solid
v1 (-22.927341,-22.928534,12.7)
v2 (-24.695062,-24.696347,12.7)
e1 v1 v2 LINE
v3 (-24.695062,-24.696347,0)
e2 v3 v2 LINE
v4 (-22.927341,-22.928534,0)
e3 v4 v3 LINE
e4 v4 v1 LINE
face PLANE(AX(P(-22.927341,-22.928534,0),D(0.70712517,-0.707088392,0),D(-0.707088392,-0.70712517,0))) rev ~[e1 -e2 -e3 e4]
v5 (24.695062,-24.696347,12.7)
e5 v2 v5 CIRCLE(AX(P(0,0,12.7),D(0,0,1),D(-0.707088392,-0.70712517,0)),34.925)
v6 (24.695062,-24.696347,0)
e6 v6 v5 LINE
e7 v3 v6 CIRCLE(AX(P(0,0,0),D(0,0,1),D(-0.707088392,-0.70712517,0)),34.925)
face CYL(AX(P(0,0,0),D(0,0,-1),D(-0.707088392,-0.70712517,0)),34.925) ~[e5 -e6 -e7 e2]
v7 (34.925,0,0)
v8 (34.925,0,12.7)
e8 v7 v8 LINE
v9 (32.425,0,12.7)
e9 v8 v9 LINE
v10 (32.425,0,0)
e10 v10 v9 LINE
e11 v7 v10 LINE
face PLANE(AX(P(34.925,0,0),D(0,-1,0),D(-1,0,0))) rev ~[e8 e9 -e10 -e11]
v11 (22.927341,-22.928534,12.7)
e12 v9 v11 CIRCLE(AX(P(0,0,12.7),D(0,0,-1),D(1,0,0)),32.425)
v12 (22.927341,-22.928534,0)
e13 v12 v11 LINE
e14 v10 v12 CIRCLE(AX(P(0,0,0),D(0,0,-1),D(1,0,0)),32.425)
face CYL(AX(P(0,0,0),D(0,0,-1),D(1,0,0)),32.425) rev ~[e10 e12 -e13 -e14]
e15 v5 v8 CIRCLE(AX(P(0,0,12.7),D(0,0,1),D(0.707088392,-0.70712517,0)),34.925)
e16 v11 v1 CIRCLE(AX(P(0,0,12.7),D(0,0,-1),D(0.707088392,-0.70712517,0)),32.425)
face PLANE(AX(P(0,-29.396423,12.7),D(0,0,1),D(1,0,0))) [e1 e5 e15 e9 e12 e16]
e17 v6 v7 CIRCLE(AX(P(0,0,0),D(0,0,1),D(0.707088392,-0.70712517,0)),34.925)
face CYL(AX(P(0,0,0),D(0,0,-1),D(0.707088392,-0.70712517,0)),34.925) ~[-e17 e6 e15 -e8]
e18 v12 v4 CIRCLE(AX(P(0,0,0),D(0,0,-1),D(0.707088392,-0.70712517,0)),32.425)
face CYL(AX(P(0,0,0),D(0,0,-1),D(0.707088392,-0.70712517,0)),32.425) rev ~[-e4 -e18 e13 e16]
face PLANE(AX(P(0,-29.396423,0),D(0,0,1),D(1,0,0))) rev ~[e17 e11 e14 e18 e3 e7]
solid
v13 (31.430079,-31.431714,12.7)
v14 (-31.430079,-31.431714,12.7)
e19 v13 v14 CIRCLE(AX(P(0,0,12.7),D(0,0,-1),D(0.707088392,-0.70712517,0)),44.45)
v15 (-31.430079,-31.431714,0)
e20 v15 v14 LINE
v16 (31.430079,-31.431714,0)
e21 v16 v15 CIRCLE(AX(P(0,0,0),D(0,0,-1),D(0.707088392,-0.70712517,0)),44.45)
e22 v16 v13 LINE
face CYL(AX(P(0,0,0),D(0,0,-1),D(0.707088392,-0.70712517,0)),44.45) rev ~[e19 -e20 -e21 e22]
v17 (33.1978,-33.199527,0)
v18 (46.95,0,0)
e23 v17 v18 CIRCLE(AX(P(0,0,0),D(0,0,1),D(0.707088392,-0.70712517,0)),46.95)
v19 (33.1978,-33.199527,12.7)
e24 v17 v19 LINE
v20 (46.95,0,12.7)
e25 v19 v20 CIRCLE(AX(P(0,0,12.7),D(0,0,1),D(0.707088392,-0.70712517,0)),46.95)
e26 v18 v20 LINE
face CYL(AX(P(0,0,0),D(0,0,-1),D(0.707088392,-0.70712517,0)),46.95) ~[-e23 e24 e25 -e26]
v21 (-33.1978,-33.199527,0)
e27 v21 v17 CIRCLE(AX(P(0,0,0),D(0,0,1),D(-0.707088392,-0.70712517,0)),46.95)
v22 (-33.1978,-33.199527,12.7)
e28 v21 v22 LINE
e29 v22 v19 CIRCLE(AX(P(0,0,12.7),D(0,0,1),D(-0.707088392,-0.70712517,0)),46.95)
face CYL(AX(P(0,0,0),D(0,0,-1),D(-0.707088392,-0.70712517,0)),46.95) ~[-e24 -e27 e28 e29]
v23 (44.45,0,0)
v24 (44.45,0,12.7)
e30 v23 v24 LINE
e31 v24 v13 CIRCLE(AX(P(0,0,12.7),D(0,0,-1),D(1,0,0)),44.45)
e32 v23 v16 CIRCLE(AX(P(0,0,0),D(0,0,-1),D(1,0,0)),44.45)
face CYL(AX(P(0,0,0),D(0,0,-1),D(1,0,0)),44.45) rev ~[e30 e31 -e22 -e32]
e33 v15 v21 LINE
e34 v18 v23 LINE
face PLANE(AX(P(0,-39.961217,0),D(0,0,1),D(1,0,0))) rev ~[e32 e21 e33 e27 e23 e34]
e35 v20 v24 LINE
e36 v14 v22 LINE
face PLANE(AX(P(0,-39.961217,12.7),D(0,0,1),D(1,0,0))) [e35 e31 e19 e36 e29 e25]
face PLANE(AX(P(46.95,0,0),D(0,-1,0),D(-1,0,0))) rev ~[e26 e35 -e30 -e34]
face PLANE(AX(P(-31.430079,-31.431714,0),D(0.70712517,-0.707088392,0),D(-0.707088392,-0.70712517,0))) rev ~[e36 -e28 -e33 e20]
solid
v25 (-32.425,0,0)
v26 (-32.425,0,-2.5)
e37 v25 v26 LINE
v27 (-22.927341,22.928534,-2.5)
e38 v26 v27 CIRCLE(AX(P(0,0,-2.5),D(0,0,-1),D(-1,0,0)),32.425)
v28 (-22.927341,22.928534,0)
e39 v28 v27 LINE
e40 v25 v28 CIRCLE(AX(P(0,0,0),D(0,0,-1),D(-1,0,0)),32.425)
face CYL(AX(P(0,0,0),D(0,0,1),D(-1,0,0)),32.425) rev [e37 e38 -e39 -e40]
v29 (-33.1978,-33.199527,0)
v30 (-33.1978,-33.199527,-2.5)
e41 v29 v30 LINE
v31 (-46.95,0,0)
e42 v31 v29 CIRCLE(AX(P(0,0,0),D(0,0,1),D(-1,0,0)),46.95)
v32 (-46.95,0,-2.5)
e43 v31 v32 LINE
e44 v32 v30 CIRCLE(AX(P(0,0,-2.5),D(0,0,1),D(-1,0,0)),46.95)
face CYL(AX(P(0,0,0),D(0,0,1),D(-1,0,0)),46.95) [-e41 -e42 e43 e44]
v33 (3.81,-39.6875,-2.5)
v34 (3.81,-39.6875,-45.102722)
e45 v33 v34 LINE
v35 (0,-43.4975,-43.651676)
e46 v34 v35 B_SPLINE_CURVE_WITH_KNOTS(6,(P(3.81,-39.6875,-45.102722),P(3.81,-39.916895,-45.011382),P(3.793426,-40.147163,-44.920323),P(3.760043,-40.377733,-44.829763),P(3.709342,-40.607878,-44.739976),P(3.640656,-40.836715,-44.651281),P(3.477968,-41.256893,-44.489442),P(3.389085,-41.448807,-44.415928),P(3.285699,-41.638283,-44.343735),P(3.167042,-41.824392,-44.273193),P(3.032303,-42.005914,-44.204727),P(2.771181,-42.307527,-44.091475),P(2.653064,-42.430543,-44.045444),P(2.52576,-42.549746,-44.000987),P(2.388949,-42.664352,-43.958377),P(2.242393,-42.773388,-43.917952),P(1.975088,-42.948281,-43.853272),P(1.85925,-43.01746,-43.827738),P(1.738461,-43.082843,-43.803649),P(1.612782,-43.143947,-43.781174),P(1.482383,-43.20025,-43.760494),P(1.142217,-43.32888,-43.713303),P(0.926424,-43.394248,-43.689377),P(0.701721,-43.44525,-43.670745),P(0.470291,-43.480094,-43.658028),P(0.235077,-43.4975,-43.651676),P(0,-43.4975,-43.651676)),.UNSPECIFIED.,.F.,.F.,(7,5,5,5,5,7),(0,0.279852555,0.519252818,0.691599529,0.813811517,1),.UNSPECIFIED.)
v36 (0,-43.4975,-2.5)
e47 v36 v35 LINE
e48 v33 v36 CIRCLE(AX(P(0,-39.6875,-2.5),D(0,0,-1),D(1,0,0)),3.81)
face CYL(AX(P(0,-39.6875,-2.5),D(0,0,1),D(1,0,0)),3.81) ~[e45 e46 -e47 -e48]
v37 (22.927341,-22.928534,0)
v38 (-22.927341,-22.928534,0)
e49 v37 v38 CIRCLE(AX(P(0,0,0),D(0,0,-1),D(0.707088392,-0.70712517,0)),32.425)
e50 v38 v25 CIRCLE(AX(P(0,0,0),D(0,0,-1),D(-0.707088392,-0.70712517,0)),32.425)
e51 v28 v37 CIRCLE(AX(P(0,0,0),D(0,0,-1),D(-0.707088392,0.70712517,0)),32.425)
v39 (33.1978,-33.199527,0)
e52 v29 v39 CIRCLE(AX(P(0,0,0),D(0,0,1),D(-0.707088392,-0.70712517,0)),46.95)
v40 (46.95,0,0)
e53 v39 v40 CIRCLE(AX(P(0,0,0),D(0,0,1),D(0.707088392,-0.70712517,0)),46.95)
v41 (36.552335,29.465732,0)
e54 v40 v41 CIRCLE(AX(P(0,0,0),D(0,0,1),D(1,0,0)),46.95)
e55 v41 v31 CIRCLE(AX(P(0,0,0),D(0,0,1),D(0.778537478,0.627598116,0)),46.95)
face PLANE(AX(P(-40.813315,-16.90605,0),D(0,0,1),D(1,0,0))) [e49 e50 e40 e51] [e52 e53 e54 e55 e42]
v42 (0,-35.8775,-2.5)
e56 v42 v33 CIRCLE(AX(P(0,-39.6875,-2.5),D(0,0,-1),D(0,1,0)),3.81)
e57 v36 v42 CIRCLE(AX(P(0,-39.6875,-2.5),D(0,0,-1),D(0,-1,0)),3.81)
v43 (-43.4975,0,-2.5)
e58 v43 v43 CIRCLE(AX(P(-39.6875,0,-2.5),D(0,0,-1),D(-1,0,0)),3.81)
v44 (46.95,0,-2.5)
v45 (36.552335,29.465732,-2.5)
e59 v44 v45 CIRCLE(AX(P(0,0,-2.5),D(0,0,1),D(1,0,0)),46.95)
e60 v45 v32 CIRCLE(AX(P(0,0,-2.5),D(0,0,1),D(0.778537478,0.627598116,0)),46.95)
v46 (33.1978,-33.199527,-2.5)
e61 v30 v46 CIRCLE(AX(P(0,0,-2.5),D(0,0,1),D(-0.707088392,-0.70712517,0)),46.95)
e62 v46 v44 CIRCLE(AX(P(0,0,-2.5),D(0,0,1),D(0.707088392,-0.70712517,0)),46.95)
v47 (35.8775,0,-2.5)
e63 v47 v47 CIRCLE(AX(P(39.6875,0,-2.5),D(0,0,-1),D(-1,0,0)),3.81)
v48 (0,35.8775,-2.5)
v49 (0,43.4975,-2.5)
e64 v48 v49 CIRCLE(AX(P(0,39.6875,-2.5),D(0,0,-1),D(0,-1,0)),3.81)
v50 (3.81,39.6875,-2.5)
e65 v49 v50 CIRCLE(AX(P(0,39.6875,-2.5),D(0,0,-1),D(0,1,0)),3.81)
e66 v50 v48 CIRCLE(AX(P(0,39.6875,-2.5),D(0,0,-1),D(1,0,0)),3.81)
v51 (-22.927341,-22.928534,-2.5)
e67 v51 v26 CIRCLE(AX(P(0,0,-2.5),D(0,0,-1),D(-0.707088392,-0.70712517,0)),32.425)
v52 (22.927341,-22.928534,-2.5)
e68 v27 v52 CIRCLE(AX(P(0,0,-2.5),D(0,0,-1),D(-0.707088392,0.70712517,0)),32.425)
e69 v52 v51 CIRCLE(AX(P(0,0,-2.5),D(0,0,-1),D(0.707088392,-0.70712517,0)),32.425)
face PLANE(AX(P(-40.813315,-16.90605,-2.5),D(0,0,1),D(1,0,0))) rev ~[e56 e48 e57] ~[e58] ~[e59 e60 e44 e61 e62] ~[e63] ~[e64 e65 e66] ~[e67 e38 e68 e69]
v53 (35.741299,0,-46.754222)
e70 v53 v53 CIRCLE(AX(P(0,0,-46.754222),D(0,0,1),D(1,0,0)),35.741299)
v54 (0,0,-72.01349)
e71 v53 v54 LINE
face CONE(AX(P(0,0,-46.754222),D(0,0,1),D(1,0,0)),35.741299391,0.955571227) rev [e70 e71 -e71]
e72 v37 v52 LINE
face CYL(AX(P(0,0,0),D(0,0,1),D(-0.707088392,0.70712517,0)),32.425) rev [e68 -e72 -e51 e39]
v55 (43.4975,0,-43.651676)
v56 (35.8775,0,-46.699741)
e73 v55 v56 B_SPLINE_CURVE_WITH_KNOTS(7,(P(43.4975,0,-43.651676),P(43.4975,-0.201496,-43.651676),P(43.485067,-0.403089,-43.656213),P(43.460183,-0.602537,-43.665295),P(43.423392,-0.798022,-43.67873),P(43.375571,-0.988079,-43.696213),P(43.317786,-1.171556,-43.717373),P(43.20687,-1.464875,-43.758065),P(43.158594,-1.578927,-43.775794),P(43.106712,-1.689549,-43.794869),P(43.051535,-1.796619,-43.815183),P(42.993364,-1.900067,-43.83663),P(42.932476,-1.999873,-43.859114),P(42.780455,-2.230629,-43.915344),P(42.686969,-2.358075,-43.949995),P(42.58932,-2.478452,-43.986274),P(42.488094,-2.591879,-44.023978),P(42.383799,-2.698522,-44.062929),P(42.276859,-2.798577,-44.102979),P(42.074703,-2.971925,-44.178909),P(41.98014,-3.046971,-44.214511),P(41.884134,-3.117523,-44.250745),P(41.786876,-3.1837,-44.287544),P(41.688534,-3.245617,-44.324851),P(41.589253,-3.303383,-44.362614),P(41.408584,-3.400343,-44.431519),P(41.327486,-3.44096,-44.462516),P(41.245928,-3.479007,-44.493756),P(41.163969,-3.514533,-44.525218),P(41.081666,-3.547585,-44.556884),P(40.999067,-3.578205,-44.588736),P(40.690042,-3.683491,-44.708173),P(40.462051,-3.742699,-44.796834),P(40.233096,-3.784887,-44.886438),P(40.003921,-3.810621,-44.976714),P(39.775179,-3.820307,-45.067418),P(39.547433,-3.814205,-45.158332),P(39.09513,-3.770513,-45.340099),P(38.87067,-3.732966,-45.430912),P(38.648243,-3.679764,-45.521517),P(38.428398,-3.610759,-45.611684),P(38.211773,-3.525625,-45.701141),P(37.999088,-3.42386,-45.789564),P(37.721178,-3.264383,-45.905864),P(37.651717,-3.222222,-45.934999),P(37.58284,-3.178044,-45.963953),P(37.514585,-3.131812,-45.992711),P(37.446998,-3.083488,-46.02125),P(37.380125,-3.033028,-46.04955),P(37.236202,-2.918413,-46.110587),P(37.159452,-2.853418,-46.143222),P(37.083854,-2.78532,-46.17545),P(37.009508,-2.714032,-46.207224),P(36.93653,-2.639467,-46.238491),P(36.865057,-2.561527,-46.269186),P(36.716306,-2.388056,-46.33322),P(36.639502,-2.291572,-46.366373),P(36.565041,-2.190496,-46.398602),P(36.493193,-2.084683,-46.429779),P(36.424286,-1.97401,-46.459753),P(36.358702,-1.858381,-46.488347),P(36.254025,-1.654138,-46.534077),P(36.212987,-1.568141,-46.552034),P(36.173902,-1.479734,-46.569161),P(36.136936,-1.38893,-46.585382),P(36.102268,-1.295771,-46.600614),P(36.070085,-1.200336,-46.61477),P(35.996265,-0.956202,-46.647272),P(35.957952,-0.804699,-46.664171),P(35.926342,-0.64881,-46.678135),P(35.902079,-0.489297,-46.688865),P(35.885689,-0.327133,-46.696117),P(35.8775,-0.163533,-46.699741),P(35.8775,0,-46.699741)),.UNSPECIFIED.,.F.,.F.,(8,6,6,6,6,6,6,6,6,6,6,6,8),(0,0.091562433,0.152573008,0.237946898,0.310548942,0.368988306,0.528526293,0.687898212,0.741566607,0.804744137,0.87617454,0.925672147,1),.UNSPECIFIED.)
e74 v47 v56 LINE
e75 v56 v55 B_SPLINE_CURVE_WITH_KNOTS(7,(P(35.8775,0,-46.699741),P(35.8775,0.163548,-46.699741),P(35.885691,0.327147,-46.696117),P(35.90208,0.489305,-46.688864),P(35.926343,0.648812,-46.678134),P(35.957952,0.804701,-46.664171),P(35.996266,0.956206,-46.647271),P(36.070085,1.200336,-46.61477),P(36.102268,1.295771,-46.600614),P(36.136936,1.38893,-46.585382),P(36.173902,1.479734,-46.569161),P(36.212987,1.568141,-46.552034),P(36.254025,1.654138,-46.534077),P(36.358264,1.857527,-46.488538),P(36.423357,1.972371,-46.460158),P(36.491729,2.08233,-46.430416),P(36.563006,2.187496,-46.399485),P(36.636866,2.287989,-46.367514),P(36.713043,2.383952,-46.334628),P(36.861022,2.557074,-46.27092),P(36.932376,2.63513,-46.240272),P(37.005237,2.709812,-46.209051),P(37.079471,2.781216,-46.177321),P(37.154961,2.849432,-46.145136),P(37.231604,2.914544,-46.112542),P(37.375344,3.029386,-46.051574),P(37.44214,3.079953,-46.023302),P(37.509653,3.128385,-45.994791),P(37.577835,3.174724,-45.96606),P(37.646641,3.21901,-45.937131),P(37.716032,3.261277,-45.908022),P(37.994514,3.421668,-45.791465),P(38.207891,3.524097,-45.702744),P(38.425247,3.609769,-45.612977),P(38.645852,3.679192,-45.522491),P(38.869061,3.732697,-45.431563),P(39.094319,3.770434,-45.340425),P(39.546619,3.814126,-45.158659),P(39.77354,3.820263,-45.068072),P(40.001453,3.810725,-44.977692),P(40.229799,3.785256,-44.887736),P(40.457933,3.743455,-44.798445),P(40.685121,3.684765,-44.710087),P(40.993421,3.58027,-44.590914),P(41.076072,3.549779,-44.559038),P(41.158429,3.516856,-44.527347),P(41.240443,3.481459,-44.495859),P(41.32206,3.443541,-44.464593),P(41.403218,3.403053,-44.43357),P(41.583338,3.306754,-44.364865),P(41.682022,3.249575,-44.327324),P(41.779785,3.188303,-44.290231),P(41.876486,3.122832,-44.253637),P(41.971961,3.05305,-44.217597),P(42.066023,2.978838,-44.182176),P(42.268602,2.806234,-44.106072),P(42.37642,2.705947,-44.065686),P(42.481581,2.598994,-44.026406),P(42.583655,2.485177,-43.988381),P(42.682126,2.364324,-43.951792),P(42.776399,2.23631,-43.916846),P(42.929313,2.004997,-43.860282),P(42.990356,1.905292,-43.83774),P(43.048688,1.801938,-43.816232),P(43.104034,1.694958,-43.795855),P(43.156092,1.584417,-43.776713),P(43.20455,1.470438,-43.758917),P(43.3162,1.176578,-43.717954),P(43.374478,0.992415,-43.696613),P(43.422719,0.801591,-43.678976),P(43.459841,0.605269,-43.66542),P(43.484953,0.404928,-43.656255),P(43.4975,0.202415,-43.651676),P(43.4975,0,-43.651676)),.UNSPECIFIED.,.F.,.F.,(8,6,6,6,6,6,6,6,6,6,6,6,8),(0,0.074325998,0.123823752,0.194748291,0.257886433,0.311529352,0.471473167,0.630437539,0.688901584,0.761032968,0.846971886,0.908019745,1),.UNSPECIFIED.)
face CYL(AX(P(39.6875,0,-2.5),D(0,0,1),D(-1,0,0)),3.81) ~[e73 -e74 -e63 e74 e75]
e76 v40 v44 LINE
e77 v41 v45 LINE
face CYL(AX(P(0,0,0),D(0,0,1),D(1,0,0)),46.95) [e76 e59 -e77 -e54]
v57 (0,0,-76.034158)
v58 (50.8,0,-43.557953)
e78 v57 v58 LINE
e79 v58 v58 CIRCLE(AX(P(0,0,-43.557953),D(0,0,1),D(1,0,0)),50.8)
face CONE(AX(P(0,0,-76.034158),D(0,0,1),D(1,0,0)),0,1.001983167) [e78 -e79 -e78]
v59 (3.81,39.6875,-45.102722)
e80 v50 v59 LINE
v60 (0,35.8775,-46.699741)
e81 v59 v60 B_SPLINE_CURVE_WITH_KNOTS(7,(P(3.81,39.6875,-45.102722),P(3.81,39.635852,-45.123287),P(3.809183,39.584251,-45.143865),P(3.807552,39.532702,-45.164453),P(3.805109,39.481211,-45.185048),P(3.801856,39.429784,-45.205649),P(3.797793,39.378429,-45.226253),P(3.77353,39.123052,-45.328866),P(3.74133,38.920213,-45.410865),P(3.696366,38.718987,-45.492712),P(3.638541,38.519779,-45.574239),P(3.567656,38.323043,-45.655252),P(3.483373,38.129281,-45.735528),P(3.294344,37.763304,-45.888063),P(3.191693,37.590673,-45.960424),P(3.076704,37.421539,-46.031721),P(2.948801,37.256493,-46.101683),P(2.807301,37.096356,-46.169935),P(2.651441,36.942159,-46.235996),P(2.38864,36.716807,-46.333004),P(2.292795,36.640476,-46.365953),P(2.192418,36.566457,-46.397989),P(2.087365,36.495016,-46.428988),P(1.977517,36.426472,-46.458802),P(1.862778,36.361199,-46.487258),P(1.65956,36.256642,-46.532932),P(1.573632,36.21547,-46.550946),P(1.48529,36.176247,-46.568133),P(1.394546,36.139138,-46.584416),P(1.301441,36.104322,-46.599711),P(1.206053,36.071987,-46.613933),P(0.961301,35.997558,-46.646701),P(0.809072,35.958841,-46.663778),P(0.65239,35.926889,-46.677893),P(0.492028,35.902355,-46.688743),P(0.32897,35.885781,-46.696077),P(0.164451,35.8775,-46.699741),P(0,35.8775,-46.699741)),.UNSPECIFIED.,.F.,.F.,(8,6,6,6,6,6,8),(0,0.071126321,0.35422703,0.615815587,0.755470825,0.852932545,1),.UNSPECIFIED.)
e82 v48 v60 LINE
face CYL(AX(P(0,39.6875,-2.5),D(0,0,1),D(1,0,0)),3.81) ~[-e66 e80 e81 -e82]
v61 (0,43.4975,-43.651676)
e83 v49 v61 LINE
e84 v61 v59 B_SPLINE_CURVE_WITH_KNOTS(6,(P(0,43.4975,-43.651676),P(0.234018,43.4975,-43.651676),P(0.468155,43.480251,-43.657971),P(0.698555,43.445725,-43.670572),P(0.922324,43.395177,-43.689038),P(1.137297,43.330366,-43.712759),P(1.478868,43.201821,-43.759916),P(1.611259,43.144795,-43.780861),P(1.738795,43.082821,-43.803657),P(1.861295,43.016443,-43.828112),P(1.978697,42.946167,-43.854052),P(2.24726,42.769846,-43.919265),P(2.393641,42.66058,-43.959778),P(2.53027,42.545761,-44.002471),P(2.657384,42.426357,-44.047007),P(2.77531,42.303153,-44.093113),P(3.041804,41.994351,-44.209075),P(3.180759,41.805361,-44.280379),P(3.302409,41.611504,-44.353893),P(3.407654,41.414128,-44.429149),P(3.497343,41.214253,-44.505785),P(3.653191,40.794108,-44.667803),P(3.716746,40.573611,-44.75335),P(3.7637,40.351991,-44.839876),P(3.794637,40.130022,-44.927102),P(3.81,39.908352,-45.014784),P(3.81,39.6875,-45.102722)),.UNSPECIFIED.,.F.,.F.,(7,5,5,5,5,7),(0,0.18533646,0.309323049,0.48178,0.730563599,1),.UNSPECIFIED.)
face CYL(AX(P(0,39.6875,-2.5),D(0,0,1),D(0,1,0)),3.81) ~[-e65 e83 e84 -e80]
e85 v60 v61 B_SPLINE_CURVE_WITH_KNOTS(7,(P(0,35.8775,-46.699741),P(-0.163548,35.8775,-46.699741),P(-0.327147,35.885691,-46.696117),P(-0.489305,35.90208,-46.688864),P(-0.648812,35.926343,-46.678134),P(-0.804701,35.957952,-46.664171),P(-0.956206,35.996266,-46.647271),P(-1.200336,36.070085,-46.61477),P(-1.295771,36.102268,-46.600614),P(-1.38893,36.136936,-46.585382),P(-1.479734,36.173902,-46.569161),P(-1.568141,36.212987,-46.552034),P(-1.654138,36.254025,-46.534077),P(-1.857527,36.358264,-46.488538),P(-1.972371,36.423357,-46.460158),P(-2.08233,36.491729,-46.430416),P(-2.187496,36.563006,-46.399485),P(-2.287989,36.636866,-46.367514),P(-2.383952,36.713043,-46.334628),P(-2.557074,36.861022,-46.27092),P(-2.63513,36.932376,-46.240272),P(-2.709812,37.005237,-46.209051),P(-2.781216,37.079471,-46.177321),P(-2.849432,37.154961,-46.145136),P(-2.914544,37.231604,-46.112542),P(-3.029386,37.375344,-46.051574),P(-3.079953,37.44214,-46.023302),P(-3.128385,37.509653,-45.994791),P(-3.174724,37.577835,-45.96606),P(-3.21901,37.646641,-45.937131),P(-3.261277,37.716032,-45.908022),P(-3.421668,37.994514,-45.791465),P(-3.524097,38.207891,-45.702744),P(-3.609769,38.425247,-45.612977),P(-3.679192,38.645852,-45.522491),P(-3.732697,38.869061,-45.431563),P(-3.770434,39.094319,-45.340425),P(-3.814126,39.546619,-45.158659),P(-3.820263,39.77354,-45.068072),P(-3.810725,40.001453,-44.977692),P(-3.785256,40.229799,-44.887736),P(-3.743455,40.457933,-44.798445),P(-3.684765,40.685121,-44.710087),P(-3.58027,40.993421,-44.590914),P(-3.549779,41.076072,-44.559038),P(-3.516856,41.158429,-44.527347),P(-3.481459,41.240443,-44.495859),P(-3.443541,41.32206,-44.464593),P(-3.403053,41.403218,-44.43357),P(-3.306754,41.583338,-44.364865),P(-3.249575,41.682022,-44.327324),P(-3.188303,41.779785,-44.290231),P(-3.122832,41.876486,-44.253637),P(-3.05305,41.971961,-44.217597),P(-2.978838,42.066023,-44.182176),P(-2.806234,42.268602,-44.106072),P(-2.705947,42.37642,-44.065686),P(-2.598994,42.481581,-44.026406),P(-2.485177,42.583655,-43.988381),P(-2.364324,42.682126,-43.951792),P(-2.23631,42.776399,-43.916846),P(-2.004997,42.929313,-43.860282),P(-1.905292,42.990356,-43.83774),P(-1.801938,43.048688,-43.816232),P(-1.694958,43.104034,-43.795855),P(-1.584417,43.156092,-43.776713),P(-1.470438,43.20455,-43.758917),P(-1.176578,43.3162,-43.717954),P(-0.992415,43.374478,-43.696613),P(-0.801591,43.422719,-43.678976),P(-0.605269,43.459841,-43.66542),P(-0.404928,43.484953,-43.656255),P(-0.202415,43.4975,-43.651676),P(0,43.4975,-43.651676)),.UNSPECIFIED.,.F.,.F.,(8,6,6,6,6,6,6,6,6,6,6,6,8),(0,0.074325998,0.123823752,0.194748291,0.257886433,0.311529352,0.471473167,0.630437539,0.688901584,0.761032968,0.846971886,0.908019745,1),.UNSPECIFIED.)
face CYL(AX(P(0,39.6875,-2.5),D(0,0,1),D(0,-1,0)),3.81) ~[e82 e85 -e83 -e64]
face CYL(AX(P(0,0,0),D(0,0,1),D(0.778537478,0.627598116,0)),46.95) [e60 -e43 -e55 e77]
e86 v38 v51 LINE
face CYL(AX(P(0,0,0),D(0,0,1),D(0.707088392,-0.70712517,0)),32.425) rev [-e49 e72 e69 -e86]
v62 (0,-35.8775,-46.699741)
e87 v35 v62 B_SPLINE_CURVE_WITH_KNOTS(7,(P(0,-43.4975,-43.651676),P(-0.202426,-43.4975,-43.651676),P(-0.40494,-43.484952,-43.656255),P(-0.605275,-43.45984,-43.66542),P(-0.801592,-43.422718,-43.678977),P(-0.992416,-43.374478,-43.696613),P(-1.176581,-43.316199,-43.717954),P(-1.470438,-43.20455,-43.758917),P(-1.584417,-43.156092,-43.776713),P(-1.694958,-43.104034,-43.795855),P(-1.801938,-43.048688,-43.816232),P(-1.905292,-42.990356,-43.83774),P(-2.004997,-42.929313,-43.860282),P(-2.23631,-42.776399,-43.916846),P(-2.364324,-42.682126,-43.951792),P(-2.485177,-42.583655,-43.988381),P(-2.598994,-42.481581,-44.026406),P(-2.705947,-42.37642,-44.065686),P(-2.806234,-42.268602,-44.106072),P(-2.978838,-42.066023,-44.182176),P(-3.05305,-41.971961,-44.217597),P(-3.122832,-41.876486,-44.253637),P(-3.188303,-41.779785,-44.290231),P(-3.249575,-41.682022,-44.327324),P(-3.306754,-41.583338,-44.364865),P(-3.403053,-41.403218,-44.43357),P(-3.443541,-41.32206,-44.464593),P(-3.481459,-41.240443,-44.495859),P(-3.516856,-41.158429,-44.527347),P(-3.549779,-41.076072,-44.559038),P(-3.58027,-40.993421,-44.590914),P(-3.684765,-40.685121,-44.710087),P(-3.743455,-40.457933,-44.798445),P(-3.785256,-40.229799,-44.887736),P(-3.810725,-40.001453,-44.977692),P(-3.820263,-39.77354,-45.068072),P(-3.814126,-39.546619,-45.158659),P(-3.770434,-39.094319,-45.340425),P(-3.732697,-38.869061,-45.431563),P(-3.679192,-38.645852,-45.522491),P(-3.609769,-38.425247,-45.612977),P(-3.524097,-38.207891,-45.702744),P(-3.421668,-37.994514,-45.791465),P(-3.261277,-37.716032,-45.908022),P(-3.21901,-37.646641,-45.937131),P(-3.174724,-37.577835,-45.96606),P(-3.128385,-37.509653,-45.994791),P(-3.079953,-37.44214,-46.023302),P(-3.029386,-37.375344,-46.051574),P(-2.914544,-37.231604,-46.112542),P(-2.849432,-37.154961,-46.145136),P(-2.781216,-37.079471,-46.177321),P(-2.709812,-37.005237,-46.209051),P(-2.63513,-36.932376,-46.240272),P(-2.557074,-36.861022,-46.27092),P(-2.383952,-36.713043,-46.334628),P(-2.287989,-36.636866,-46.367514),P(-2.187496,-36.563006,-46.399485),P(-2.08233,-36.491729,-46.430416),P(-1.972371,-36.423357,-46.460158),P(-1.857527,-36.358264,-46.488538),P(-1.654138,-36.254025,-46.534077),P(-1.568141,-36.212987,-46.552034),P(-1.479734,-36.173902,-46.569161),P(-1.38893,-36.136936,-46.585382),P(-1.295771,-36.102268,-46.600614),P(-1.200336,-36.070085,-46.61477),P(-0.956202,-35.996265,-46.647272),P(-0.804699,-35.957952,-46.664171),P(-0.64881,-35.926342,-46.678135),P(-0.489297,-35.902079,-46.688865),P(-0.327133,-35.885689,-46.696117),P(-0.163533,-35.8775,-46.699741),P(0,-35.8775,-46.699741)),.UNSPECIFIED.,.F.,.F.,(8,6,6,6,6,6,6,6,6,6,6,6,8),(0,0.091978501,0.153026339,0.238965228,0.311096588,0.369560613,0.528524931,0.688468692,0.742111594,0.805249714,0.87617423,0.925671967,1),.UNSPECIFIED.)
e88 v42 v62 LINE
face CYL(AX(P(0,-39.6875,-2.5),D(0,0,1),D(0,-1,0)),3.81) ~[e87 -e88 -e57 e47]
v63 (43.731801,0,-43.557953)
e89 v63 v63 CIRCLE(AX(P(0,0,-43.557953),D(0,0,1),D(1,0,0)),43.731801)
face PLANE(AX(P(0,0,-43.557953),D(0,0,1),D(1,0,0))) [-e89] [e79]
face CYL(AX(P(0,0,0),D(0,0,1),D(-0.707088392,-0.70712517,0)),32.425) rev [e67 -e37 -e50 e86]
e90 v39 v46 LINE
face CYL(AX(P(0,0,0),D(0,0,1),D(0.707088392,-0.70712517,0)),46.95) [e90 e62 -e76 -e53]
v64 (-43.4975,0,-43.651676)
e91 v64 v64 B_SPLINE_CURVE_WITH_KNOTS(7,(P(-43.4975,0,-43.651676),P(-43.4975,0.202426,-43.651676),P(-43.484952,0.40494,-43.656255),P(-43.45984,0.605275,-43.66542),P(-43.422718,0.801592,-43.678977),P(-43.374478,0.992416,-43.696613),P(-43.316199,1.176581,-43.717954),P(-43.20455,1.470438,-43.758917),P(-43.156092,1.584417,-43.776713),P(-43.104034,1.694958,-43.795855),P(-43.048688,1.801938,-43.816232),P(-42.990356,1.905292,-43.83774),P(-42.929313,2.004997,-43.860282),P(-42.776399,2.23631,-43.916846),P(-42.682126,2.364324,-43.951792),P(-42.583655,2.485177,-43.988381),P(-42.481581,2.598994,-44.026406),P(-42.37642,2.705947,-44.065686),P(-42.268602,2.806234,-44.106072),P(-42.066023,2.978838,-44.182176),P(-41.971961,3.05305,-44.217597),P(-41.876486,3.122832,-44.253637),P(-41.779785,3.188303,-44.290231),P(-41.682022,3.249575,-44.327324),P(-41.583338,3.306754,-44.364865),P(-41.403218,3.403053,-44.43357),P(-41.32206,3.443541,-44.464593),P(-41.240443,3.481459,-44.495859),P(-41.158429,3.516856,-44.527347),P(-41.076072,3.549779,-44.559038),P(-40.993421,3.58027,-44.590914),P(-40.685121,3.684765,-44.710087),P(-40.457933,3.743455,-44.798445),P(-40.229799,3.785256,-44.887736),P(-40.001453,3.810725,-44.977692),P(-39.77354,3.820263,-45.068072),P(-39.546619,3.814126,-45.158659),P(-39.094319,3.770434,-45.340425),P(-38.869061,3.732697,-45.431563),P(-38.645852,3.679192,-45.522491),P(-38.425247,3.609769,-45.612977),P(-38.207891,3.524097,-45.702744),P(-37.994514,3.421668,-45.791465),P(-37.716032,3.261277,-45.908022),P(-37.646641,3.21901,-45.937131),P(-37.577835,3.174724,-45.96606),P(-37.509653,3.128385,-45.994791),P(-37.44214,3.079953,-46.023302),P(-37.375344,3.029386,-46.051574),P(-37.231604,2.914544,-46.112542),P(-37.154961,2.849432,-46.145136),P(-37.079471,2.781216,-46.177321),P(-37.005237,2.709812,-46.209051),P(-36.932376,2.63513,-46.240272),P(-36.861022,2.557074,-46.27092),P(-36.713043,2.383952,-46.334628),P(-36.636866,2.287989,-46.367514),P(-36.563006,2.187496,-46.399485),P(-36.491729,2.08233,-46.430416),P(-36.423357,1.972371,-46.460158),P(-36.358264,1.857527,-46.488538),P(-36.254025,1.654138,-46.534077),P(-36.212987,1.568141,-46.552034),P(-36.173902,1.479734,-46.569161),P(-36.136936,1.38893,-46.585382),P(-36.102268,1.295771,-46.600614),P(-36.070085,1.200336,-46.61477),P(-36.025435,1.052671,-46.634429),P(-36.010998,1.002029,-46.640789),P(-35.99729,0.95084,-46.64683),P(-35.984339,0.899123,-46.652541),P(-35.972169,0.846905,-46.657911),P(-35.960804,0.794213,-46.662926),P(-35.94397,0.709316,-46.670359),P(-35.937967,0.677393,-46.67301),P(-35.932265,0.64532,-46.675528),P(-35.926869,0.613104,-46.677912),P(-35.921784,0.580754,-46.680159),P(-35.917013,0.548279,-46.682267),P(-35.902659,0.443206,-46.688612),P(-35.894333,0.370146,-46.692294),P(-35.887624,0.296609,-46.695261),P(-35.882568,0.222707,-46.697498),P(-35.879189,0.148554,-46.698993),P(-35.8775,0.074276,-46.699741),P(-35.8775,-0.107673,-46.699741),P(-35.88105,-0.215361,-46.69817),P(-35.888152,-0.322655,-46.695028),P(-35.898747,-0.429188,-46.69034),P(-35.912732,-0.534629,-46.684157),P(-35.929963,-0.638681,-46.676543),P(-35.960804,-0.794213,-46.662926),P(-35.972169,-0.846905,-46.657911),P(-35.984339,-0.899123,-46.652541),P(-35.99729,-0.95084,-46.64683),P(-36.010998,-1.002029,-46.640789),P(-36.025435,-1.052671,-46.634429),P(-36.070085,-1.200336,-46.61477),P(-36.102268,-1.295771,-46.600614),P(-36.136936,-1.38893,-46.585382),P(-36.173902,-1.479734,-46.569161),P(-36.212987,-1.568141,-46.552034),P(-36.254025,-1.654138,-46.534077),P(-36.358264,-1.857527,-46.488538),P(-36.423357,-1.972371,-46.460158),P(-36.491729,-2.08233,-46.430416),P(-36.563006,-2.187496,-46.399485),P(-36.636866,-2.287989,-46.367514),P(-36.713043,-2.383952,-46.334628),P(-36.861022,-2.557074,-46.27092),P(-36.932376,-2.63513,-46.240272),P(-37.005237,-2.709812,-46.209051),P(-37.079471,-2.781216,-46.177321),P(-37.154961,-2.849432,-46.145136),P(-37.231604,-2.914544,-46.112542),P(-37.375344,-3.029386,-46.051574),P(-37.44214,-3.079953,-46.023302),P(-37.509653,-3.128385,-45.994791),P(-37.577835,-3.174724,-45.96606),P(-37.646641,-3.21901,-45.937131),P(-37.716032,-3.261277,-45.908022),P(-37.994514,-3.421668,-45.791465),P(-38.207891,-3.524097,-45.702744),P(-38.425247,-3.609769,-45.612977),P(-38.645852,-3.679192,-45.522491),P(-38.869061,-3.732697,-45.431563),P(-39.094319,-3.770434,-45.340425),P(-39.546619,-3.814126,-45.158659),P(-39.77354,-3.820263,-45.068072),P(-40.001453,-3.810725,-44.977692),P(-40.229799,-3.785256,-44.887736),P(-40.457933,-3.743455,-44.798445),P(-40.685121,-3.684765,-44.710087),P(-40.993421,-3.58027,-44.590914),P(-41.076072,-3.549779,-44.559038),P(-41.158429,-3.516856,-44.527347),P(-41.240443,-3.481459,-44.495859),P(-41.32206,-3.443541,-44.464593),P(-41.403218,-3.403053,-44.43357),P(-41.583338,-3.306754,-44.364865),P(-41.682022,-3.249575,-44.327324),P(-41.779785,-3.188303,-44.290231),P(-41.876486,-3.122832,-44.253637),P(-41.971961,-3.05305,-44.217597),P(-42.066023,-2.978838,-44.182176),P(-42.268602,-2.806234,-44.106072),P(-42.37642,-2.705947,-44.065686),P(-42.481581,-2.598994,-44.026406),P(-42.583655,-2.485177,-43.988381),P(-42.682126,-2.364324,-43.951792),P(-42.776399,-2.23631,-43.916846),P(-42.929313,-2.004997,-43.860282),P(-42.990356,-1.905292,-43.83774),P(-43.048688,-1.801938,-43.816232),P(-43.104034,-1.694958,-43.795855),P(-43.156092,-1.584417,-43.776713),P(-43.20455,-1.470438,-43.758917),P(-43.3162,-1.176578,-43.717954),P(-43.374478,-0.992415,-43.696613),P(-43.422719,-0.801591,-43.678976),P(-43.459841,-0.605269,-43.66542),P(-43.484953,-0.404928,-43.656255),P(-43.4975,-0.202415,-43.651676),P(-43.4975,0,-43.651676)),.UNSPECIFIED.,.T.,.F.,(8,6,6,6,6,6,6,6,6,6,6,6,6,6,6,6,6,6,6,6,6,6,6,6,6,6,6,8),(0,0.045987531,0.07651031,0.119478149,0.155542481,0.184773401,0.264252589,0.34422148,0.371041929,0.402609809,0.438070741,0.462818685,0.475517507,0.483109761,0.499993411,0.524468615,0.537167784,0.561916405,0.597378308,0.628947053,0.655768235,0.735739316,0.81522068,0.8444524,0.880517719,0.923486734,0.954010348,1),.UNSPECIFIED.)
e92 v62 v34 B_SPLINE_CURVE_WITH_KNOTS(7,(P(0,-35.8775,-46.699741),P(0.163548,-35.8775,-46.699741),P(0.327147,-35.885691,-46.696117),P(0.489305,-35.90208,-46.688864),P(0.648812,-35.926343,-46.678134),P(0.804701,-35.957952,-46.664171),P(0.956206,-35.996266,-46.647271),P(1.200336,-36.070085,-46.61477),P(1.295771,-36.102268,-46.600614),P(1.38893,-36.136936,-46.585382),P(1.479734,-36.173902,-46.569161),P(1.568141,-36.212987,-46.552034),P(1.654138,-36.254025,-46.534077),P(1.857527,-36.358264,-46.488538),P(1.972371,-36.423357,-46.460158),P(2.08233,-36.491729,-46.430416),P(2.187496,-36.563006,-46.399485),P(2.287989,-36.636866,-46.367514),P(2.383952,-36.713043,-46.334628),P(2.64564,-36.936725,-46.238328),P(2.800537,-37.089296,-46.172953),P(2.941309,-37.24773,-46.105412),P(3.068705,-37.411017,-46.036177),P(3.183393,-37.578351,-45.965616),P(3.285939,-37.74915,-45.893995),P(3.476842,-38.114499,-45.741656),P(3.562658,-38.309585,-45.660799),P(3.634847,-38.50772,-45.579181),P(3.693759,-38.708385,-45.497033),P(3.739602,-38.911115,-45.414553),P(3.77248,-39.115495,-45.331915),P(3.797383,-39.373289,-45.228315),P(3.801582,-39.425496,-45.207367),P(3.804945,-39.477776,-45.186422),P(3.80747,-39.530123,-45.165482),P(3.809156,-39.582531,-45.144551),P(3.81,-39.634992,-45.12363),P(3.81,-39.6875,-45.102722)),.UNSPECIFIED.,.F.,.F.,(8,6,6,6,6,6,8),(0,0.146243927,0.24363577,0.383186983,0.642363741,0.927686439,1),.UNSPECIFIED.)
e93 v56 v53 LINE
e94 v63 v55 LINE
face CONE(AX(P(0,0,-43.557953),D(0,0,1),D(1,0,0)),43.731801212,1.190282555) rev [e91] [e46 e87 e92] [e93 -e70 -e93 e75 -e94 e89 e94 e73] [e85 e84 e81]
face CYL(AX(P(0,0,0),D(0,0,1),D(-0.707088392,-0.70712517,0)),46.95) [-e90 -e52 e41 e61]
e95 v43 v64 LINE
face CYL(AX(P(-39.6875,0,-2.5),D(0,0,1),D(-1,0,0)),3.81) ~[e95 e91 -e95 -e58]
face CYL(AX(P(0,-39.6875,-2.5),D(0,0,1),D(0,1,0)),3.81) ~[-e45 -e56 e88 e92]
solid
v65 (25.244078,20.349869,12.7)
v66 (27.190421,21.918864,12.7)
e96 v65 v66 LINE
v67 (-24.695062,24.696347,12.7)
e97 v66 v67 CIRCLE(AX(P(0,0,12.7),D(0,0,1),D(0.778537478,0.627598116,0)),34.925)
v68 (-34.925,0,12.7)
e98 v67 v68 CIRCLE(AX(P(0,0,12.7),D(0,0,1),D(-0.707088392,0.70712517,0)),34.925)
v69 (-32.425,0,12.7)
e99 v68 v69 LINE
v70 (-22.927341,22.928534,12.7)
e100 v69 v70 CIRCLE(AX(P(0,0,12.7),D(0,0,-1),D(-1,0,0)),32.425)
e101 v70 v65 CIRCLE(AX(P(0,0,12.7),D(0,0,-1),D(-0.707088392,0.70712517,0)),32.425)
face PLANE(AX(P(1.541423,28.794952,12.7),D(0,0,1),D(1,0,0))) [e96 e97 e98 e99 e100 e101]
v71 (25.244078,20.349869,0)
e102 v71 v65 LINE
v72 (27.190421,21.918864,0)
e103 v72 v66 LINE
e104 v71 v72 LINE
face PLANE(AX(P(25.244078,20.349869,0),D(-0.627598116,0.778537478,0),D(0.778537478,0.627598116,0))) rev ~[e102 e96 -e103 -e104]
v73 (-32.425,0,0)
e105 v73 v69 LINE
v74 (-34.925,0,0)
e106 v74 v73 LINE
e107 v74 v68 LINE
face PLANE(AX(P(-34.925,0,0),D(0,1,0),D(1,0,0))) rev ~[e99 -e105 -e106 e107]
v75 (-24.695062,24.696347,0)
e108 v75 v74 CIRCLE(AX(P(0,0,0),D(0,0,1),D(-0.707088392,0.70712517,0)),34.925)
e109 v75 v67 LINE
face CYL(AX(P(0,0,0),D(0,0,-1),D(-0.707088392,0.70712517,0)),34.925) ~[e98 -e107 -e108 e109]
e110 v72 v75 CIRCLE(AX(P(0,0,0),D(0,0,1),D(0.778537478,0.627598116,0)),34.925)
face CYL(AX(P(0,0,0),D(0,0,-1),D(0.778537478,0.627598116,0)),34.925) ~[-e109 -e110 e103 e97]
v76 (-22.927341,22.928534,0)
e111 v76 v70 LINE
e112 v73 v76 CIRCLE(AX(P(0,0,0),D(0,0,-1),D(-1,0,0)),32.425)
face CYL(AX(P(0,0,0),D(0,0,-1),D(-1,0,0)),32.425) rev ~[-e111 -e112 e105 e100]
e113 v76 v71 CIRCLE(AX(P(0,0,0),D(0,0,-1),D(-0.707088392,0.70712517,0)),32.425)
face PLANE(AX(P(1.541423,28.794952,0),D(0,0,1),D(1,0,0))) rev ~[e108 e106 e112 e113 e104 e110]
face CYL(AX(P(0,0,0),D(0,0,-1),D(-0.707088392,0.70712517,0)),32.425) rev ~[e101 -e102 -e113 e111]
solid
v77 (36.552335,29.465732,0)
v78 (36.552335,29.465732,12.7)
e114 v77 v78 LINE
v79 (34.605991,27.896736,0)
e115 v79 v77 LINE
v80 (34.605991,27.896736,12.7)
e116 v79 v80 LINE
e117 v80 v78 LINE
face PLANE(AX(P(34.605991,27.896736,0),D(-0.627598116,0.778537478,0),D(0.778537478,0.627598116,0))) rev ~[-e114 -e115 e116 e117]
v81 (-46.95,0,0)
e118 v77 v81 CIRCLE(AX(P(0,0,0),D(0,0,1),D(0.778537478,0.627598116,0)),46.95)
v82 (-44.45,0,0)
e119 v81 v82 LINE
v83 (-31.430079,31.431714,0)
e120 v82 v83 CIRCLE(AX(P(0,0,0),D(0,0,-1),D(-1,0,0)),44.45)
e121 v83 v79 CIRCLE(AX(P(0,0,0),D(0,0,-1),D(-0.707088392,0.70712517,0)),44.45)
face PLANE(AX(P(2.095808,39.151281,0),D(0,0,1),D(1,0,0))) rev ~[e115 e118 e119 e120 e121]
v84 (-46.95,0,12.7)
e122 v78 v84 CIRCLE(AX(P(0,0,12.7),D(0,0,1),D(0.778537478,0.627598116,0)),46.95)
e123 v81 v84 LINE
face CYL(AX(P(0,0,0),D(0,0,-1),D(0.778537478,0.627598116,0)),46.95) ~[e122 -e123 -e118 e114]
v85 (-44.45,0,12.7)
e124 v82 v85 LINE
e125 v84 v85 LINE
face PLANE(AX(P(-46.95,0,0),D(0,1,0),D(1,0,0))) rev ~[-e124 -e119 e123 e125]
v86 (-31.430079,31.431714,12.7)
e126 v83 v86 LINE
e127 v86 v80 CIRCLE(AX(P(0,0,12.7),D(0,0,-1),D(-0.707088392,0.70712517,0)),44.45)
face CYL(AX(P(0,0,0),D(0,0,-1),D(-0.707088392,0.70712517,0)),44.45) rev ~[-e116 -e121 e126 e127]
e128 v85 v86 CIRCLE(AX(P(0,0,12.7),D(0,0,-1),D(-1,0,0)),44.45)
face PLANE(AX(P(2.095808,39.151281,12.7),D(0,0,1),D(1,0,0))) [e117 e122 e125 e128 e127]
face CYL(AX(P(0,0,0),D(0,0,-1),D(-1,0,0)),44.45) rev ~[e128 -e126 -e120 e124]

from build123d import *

# Parameters (mm, degrees)
F1_DEPTH = 12.7
F2_DEPTH = 2.5
F4_DEPTH = 44.45


# Not quite as in the source:
# - a length typed as a fraction of an inch, garbled in the dataset ("3 / 203.2 mm" for 3/8 in), is restored


with BuildPart() as f1:
    # F0 (on Top) → F1 (new body)
    with BuildSketch(Plane.XY):
        with BuildLine():
            Line((33.1977999888, -33.1995267422), (31.4300790096, -31.4317138166))
            ThreePointArc((31.4300790096, -31.4317138166), (0, -44.45), (-31.4300790096, -31.4317138166))
            Line((-31.4300790096, -31.4317138166), (-33.1977999888, -33.1995267422))
            ThreePointArc((-33.1977999888, -33.1995267422), (0, -46.95), (33.1977999888, -33.1995267422))
        make_face()
        with BuildLine():
            Line((46.95, 0), (44.45, 0))
            ThreePointArc((44.45, 0), (41.0662240289, -17.0108125618), (31.4300790096, -31.4317138166))
            Line((31.4300790096, -31.4317138166), (33.1977999888, -33.1995267422))
            ThreePointArc((33.1977999888, -33.1995267422), (43.3759104197, -17.967551176), (46.95, 0))
        make_face()
    extrude(amount=F1_DEPTH)


with BuildPart() as f1b:
    # F0 (on Top) → F1, piece 2 (new body)
    with BuildSketch(Plane.XY):
        with BuildLine():
            ThreePointArc((-31.4300790096, 31.4317138166), (2.3760514819, 44.3864492763), (34.6059908934, 27.8967362658))
            Line((34.6059908934, 27.8967362658), (36.5523345882, 29.4657315563))
            ThreePointArc((36.5523345882, 29.4657315563), (2.5096876732, 46.8828749949), (-33.1977999888, 33.1995267422))
            Line((-33.1977999888, 33.1995267422), (-31.4300790096, 31.4317138166))
        make_face()
        with BuildLine():
            ThreePointArc((-44.45, 0), (-41.0662240289, 17.0108125618), (-31.4300790096, 31.4317138166))
            Line((-31.4300790096, 31.4317138166), (-33.1977999888, 33.1995267422))
            ThreePointArc((-33.1977999888, 33.1995267422), (-43.3759104197, 17.967551176), (-46.95, 0))
            Line((-46.95, 0), (-44.45, 0))
        make_face()
    extrude(amount=F1_DEPTH)


with BuildPart() as f1c:
    # F0 (on Top) → F1, piece 3 (new body)
    with BuildSketch(Plane.XY):
        with BuildLine():
            ThreePointArc((-24.695062079, -24.6963465702), (0, -34.925), (24.695062079, -24.6963465702))
            Line((24.695062079, -24.6963465702), (23.4743895005, -23.4756104995))
            Line((23.4743895005, -23.4756104995), (22.9273410998, -22.9285336446))
            ThreePointArc((22.9273410998, -22.9285336446), (0, -32.425), (-22.9273410998, -22.9285336446))
            Line((-22.9273410998, -22.9285336446), (-24.695062079, -24.6963465702))
        make_face()
        with BuildLine():
            ThreePointArc((24.695062079, -24.6963465702), (32.2663188798, -13.3656384414), (34.925, 0))
            Line((34.925, 0), (32.425, 0))
            ThreePointArc((32.425, 0), (29.956632489, -12.4088998271), (22.9273410998, -22.9285336446))
            Line((22.9273410998, -22.9285336446), (23.4743895005, -23.4756104995))
            Line((23.4743895005, -23.4756104995), (24.695062079, -24.6963465702))
        make_face()
    extrude(amount=F1_DEPTH)


with BuildPart() as f1d:
    # F0 (on Top) → F1, piece 4 (new body)
    with BuildSketch(Plane.XY):
        with BuildLine():
            Line((25.2440777215, 20.3498689183), (27.1904214163, 21.9188642088))
            ThreePointArc((27.1904214163, 21.9188642088), (1.8668975929, 34.8750672885), (-24.695062079, 24.6963465702))
            Line((-24.695062079, 24.6963465702), (-22.9273410998, 22.9285336446))
            ThreePointArc((-22.9273410998, 22.9285336446), (1.7332614016, 32.3786415699), (25.2440777215, 20.3498689183))
        make_face()
        with BuildLine():
            Line((-22.9273410998, 22.9285336446), (-24.695062079, 24.6963465702))
            ThreePointArc((-24.695062079, 24.6963465702), (-32.2663188798, 13.3656384414), (-34.925, 0))
            Line((-34.925, 0), (-32.425, 0))
            ThreePointArc((-32.425, 0), (-29.956632489, 12.4088998271), (-22.9273410998, 22.9285336446))
        make_face()
    extrude(amount=F1_DEPTH)


with BuildPart() as f2:
    # F0 (on Top) → F2 (new body)
    with BuildSketch(Plane.XY):
        with BuildLine():
            Line((-33.1977999888, -33.1995267422), (-31.4300790096, -31.4317138166))
            ThreePointArc((-31.4300790096, -31.4317138166), (-41.0662240289, -17.0108125618), (-44.45, 0))
            Line((-44.45, 0), (-46.95, 0))
            ThreePointArc((-46.95, 0), (-43.3759104197, -17.967551176), (-33.1977999888, -33.1995267422))
        make_face()
        with BuildLine():
            Line((33.1977999888, -33.1995267422), (31.4300790096, -31.4317138166))
            ThreePointArc((31.4300790096, -31.4317138166), (0, -44.45), (-31.4300790096, -31.4317138166))
            Line((-31.4300790096, -31.4317138166), (-33.1977999888, -33.1995267422))
            ThreePointArc((-33.1977999888, -33.1995267422), (0, -46.95), (33.1977999888, -33.1995267422))
        make_face()
        with BuildLine():
            Line((-31.4300790096, -31.4317138166), (-24.695062079, -24.6963465702))
            ThreePointArc((-24.695062079, -24.6963465702), (-32.2663188798, -13.3656384414), (-34.925, 0))
            Line((-34.925, 0), (-44.45, 0))
            ThreePointArc((-44.45, 0), (-41.0662240289, -17.0108125618), (-31.4300790096, -31.4317138166))
        make_face()
        with BuildLine():
            Line((31.4300790096, -31.4317138166), (24.695062079, -24.6963465702))
            ThreePointArc((24.695062079, -24.6963465702), (0, -34.925), (-24.695062079, -24.6963465702))
            Line((-24.695062079, -24.6963465702), (-31.4300790096, -31.4317138166))
            ThreePointArc((-31.4300790096, -31.4317138166), (0, -44.45), (31.4300790096, -31.4317138166))
        make_face()
        with BuildLine():
            Line((44.45, 0), (34.925, 0))
            ThreePointArc((34.925, 0), (32.2663188798, -13.3656384414), (24.695062079, -24.6963465702))
            Line((24.695062079, -24.6963465702), (31.4300790096, -31.4317138166))
            ThreePointArc((31.4300790096, -31.4317138166), (41.0662240289, -17.0108125618), (44.45, 0))
        make_face()
        with BuildLine():
            ThreePointArc((-24.695062079, -24.6963465702), (0, -34.925), (24.695062079, -24.6963465702))
            Line((24.695062079, -24.6963465702), (23.4743895005, -23.4756104995))
            Line((23.4743895005, -23.4756104995), (22.9273410998, -22.9285336446))
            ThreePointArc((22.9273410998, -22.9285336446), (0, -32.425), (-22.9273410998, -22.9285336446))
            Line((-22.9273410998, -22.9285336446), (-24.695062079, -24.6963465702))
        make_face()
        with BuildLine():
            ThreePointArc((-34.925, 0), (-32.2663188798, -13.3656384414), (-24.695062079, -24.6963465702))
            Line((-24.695062079, -24.6963465702), (-22.9273410998, -22.9285336446))
            ThreePointArc((-22.9273410998, -22.9285336446), (-29.956632489, -12.4088998271), (-32.425, 0))
            Line((-32.425, 0), (-34.925, 0))
        make_face()
        with BuildLine():
            ThreePointArc((24.695062079, -24.6963465702), (32.2663188798, -13.3656384414), (34.925, 0))
            Line((34.925, 0), (32.425, 0))
            ThreePointArc((32.425, 0), (29.956632489, -12.4088998271), (22.9273410998, -22.9285336446))
            Line((22.9273410998, -22.9285336446), (23.4743895005, -23.4756104995))
            Line((23.4743895005, -23.4756104995), (24.695062079, -24.6963465702))
        make_face()
        with BuildLine():
            Line((46.95, 0), (44.45, 0))
            ThreePointArc((44.45, 0), (41.0662240289, -17.0108125618), (31.4300790096, -31.4317138166))
            Line((31.4300790096, -31.4317138166), (33.1977999888, -33.1995267422))
            ThreePointArc((33.1977999888, -33.1995267422), (43.3759104197, -17.967551176), (46.95, 0))
        make_face()
        with BuildLine():
            ThreePointArc((34.6059908934, 27.8967362658), (41.9168152131, 14.7913184806), (44.45, 0))
            Line((44.45, 0), (46.95, 0))
            ThreePointArc((46.95, 0), (44.274341378, 15.6232261566), (36.5523345882, 29.4657315563))
            Line((36.5523345882, 29.4657315563), (34.6059908934, 27.8967362658))
        make_face()
        with BuildLine():
            ThreePointArc((27.1904214163, 21.9188642088), (32.9346405246, 11.6217502347), (34.925, 0))
            Line((34.925, 0), (44.45, 0))
            ThreePointArc((44.45, 0), (41.9168152131, 14.7913184806), (34.6059908934, 27.8967362658))
            Line((34.6059908934, 27.8967362658), (27.1904214163, 21.9188642088))
        make_face()
        with BuildLine():
            Line((32.425, 0), (34.925, 0))
            ThreePointArc((34.925, 0), (32.9346405246, 11.6217502347), (27.1904214163, 21.9188642088))
            Line((27.1904214163, 21.9188642088), (25.2440777215, 20.3498689183))
            ThreePointArc((25.2440777215, 20.3498689183), (30.5771143596, 10.7898425587), (32.425, 0))
        make_face()
        with BuildLine():
            ThreePointArc((-24.695062079, 24.6963465702), (1.8668975929, 34.8750672885), (27.1904214163, 21.9188642088))
            Line((27.1904214163, 21.9188642088), (34.6059908934, 27.8967362658))
            ThreePointArc((34.6059908934, 27.8967362658), (2.3760514819, 44.3864492763), (-31.4300790096, 31.4317138166))
            Line((-31.4300790096, 31.4317138166), (-24.695062079, 24.6963465702))
        make_face()
        with BuildLine():
            ThreePointArc((-34.925, 0), (-32.2663188798, 13.3656384414), (-24.695062079, 24.6963465702))
            Line((-24.695062079, 24.6963465702), (-31.4300790096, 31.4317138166))
            ThreePointArc((-31.4300790096, 31.4317138166), (-41.0662240289, 17.0108125618), (-44.45, 0))
            Line((-44.45, 0), (-34.925, 0))
        make_face()
        with BuildLine():
            Line((-22.9273410998, 22.9285336446), (-24.695062079, 24.6963465702))
            ThreePointArc((-24.695062079, 24.6963465702), (-32.2663188798, 13.3656384414), (-34.925, 0))
            Line((-34.925, 0), (-32.425, 0))
            ThreePointArc((-32.425, 0), (-29.956632489, 12.4088998271), (-22.9273410998, 22.9285336446))
        make_face()
        with BuildLine():
            Line((25.2440777215, 20.3498689183), (27.1904214163, 21.9188642088))
            ThreePointArc((27.1904214163, 21.9188642088), (1.8668975929, 34.8750672885), (-24.695062079, 24.6963465702))
            Line((-24.695062079, 24.6963465702), (-22.9273410998, 22.9285336446))
            ThreePointArc((-22.9273410998, 22.9285336446), (1.7332614016, 32.3786415699), (25.2440777215, 20.3498689183))
        make_face()
        with BuildLine():
            ThreePointArc((-44.45, 0), (-41.0662240289, 17.0108125618), (-31.4300790096, 31.4317138166))
            Line((-31.4300790096, 31.4317138166), (-33.1977999888, 33.1995267422))
            ThreePointArc((-33.1977999888, 33.1995267422), (-43.3759104197, 17.967551176), (-46.95, 0))
            Line((-46.95, 0), (-44.45, 0))
        make_face()
        with BuildLine():
            ThreePointArc((-31.4300790096, 31.4317138166), (2.3760514819, 44.3864492763), (34.6059908934, 27.8967362658))
            Line((34.6059908934, 27.8967362658), (36.5523345882, 29.4657315563))
            ThreePointArc((36.5523345882, 29.4657315563), (2.5096876732, 46.8828749949), (-33.1977999888, 33.1995267422))
            Line((-33.1977999888, 33.1995267422), (-31.4300790096, 31.4317138166))
        make_face()
    extrude(amount=-F2_DEPTH)

    # F3 (on face) → F4 (join)
    with BuildSketch(Plane(origin=(0, 0, -2.5), x_dir=(1, 0, 0), z_dir=(0, 0, -1))):
        with BuildLine():
            Line((0, 39.6875), (0, 43.4975))
            ThreePointArc((0, 43.4975), (-3.81, 39.6875), (0, 35.8775))
            Line((0, 35.8775), (0, 39.6875))
        make_face()
        with BuildLine():
            ThreePointArc((3.81, 39.6875), (2.6940768363, 42.3815768363), (0, 43.4975))
            Line((0, 43.4975), (0, 39.6875))
            Line((0, 39.6875), (0, 35.8775))
            ThreePointArc((0, 35.8775), (2.6940768363, 36.9934231637), (3.81, 39.6875))
        make_face()
        with BuildLine():
            Line((35.8775, 0), (43.4975, 0))
            ThreePointArc((43.4975, 0), (39.6875, 3.81), (35.8775, 0))
        make_face()
        with BuildLine():
            ThreePointArc((35.8775, 0), (39.6875, -3.81), (43.4975, 0))
            Line((43.4975, 0), (35.8775, 0))
        make_face()
        with BuildLine():
            ThreePointArc((-35.8775, 0), (-39.6875, 3.81), (-43.4975, 0))
            Line((-43.4975, 0), (-35.8775, 0))
        make_face()
        with BuildLine():
            Line((-35.8775, 0), (-43.4975, 0))
            ThreePointArc((-43.4975, 0), (-39.6875, -3.81), (-35.8775, 0))
        make_face()
        with BuildLine():
            ThreePointArc((0, -35.8775), (-3.81, -39.6875), (0, -43.4975))
            Line((0, -43.4975), (0, -35.8775))
        make_face()
        with BuildLine():
            Line((0, -35.8775), (0, -43.4975))
            ThreePointArc((0, -43.4975), (2.6940768363, -42.3815768363), (3.81, -39.6875))
            ThreePointArc((3.81, -39.6875), (2.6940768363, -36.9934231637), (0, -35.8775))
        make_face()
    extrude(amount=F4_DEPTH)

    # F5 (on Front) → F6 (revolve)
    with BuildSketch(Plane.XZ):
        Polygon((0, -76.0341584682), (50.8, -43.5579530895), (43.7318012118, -43.5579530895), (35.7412993908, -46.7542223632), (0, -72.013489902), align=None)
    revolve(axis=Axis((0, 0, -74.0238241851), (0, 0, 1)))


solid = Compound([f1.part, f1b.part, f1c.part, f1d.part, f2.part])
